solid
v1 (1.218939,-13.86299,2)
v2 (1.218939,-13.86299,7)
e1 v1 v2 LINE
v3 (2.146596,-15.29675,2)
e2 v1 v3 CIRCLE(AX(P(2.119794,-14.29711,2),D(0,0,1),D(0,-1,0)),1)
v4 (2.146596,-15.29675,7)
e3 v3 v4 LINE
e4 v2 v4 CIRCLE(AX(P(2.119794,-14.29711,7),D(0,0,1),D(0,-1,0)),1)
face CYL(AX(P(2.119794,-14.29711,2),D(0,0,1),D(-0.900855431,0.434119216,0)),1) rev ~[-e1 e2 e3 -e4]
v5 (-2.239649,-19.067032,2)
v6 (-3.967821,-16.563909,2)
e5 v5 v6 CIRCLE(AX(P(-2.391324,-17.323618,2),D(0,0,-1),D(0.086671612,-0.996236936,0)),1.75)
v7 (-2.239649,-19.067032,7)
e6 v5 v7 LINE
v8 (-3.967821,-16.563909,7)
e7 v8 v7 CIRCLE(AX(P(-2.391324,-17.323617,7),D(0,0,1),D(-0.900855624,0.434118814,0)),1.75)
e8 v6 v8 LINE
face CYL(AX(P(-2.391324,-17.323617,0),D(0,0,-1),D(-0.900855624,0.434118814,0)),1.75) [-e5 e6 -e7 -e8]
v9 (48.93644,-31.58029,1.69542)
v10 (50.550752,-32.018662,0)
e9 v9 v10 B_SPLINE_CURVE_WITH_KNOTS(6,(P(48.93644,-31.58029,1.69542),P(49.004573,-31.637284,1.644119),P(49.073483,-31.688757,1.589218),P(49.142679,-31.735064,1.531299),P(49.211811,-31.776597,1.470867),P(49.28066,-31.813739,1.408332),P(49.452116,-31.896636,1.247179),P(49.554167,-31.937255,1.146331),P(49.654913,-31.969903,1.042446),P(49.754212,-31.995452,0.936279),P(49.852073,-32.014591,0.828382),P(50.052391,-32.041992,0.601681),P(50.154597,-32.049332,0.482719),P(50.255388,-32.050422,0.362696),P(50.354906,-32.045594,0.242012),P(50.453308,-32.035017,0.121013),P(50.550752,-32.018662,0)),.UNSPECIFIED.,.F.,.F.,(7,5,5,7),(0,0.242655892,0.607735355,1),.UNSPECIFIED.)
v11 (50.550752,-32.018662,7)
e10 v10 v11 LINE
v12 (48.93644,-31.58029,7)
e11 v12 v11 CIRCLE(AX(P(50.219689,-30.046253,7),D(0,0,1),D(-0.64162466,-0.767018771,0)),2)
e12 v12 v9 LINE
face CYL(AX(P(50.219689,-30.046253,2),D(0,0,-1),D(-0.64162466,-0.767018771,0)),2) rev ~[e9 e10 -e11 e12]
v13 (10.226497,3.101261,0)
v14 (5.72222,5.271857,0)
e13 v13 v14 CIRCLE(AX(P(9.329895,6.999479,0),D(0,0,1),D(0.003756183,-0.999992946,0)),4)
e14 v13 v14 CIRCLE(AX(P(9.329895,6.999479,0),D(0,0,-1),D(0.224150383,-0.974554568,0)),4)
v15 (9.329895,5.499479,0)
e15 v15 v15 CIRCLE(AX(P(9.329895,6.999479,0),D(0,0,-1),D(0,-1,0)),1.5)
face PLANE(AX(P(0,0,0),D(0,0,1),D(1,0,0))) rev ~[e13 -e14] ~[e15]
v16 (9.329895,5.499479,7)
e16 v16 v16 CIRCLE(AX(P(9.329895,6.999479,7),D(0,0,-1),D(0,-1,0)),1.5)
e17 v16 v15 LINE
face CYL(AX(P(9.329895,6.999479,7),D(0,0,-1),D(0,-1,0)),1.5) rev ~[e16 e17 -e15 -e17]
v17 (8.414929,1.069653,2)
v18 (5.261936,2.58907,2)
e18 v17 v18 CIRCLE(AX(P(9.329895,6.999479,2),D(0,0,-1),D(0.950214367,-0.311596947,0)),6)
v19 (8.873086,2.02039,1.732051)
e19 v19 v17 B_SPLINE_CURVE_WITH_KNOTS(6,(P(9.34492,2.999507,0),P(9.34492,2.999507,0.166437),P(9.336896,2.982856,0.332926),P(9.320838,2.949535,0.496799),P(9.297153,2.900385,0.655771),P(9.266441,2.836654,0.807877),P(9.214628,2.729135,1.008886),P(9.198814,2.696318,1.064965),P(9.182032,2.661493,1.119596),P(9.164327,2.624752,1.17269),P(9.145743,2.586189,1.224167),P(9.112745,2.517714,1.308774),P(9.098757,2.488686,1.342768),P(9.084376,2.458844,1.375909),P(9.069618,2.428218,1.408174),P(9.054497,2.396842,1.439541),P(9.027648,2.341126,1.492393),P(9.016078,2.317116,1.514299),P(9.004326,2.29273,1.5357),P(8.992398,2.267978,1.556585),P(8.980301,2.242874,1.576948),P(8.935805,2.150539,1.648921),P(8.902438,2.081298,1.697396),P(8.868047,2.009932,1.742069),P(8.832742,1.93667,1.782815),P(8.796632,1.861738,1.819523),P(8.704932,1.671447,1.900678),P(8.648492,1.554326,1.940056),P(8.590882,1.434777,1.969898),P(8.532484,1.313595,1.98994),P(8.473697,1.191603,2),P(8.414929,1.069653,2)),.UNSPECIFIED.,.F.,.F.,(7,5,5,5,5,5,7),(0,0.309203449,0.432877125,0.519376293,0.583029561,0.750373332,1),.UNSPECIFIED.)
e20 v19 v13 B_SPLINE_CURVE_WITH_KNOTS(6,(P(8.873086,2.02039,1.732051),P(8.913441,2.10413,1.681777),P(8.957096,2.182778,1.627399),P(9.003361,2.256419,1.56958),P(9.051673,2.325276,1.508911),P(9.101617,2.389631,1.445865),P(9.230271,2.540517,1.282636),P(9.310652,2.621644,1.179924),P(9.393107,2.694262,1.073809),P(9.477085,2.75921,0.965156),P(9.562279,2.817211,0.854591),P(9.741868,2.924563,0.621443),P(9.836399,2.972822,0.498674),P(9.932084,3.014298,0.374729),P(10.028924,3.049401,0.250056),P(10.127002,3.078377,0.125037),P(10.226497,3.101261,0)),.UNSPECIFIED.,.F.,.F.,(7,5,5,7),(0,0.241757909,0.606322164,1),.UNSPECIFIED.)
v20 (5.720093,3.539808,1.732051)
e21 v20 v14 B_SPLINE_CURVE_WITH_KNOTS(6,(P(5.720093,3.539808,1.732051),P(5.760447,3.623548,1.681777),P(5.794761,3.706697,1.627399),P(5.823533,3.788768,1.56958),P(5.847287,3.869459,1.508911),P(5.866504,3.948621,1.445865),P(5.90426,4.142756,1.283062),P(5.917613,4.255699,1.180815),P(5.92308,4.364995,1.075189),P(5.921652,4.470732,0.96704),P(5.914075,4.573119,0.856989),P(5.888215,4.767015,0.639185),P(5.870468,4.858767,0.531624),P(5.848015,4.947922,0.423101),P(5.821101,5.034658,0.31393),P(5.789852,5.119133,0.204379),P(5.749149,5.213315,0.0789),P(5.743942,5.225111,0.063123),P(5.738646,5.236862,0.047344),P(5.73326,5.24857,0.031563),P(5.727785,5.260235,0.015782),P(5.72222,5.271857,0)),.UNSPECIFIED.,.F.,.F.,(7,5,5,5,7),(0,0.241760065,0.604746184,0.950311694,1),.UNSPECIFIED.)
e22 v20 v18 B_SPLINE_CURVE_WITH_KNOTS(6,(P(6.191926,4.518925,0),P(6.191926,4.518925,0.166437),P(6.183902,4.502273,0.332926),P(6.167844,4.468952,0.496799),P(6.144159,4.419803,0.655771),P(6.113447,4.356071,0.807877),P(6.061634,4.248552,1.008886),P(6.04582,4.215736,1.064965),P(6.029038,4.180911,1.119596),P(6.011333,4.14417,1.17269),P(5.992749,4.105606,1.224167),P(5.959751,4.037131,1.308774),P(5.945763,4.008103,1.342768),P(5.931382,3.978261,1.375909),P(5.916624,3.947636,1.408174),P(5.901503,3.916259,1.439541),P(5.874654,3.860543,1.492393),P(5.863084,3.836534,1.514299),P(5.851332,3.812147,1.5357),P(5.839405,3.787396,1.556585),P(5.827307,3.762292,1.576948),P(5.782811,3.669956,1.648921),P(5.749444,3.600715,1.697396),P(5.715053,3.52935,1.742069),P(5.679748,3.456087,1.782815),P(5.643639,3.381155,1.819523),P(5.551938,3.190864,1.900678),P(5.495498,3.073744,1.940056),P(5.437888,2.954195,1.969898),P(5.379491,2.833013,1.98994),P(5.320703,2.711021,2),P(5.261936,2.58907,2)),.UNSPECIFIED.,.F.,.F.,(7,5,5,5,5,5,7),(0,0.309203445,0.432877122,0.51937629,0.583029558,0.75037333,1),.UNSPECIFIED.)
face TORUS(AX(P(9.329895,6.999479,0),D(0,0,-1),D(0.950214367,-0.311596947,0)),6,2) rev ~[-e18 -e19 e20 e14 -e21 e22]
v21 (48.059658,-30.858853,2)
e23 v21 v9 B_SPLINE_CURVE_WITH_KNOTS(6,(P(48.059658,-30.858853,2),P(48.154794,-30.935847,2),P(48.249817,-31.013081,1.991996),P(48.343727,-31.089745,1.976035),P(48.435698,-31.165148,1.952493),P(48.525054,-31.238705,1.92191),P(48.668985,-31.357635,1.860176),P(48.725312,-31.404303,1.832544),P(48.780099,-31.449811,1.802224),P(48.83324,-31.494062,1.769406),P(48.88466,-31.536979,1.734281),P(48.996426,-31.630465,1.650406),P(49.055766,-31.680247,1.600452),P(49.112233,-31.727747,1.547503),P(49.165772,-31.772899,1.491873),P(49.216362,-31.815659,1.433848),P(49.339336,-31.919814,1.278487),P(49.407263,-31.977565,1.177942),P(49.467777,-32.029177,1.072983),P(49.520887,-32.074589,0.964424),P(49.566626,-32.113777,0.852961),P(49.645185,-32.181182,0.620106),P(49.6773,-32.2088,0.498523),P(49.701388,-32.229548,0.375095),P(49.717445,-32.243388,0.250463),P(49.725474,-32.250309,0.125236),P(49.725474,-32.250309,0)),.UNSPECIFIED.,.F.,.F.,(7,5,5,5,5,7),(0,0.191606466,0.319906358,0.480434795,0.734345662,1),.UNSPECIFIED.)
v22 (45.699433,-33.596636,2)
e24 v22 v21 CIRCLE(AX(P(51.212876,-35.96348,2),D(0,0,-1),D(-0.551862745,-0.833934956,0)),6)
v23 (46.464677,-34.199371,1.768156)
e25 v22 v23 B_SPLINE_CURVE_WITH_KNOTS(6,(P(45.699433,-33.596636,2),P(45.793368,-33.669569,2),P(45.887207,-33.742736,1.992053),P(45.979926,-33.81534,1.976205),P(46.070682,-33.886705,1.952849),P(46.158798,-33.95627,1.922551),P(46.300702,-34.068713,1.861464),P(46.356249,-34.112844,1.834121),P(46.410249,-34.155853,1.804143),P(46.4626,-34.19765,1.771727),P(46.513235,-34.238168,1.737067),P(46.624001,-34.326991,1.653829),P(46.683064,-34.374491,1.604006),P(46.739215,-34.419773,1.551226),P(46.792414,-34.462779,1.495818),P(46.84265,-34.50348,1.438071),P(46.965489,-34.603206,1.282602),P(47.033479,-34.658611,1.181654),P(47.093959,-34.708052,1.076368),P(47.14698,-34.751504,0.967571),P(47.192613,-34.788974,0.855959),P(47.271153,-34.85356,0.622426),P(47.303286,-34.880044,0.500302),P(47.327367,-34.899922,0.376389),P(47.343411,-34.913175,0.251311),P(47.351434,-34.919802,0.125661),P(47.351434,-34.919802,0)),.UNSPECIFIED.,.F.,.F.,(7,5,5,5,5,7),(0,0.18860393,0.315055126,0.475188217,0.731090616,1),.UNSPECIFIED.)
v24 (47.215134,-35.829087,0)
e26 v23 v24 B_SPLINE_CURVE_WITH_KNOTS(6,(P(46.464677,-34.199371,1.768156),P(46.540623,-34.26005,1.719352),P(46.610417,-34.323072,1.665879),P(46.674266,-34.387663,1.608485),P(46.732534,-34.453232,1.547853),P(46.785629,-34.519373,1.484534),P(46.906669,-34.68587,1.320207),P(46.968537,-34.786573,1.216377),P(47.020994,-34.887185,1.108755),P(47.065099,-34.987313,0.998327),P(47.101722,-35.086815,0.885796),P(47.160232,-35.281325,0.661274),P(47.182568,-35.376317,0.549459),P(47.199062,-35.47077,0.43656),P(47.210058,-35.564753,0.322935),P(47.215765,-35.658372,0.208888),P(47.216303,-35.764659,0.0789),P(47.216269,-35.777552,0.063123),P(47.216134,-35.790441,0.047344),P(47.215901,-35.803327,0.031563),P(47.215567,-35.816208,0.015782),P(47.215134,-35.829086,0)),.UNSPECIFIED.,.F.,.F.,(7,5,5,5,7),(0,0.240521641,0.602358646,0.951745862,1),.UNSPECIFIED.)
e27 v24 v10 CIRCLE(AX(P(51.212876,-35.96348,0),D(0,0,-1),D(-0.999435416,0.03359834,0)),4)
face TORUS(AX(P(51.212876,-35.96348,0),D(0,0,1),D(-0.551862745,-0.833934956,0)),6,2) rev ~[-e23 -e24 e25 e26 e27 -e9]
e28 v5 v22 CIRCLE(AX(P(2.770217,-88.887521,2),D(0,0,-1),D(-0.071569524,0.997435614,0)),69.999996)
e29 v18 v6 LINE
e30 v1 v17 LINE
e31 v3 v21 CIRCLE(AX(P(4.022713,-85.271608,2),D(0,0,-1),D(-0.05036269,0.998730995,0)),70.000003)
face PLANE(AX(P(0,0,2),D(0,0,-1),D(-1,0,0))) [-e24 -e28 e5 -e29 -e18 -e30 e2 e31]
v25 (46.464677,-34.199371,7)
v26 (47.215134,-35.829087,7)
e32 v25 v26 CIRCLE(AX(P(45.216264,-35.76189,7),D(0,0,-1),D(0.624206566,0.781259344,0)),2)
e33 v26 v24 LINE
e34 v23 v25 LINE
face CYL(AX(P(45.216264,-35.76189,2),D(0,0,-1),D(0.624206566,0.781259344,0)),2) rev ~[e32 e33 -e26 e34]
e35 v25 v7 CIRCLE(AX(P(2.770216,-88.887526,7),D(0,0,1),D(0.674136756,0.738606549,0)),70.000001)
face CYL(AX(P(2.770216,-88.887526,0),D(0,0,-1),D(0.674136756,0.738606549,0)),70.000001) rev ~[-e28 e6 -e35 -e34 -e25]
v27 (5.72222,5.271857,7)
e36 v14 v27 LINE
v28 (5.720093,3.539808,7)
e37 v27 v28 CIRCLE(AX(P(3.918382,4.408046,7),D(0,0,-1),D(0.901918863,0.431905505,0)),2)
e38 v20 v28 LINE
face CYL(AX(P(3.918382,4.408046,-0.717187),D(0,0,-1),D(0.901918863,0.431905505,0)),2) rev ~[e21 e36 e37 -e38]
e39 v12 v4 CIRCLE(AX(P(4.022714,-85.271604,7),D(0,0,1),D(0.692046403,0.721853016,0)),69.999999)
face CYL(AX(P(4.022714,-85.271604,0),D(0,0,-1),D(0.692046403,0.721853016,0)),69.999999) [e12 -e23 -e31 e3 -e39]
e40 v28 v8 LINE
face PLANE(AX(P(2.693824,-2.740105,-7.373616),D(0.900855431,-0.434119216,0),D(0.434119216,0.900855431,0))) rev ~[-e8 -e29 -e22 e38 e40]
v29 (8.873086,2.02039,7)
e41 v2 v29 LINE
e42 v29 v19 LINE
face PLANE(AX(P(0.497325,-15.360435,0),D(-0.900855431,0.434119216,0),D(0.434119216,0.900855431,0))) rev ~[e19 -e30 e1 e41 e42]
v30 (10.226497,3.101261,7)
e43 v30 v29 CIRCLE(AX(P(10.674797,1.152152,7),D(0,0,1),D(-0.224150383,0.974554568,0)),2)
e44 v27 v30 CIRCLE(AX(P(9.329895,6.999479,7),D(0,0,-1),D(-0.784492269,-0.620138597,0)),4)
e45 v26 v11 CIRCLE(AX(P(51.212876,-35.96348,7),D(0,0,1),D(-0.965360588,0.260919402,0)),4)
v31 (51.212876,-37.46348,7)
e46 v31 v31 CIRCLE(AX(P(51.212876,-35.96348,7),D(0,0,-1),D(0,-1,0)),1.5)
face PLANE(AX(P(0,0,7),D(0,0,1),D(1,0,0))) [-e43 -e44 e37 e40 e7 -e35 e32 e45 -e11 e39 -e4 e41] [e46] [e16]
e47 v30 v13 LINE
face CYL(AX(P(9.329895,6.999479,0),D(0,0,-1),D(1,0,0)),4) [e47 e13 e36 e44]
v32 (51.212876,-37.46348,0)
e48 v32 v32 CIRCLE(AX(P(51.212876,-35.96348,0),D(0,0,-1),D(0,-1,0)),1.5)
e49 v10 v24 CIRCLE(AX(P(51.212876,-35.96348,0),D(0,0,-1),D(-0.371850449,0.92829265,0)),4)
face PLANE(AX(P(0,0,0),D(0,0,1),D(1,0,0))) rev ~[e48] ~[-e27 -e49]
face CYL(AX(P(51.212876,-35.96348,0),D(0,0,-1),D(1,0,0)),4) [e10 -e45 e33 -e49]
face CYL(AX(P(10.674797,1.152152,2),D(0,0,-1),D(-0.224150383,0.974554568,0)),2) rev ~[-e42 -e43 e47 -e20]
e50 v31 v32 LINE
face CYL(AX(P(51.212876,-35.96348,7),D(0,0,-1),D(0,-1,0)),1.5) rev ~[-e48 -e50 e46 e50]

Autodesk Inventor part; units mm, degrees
ref_plane "YZ Plane" through (0, 0, 0) normal (1, 0, 0) x (0, 1, 0)
ref_plane "XZ Plane" through (0, 0, 0) normal (0, 1, 0) x (-1, 0, 0)
ref_plane "XY Plane" through (0, 0, 0) normal (0, 0, 1) x (1, 0, 0)
sketch "Sketch1" plane through (0, 0, 0) normal (0, 0, 1) x (1, 0, 0)
  circle A0 centre (9.329895, 6.999479) radius 4
  line L0 (9.329895, 6.999479) -> (-2.391324, -17.323617)
  circle A1 centre (51.212876, -35.96348) radius 4
  line L1 (9.329895, 6.999479) -> (-2.391324, -17.323617) construction
  line L2 (7.753398, 7.759188) -> (-3.967821, -16.563909)
  line L3 (-0.814827, -18.083326) -> (10.906392, 6.239771)
  arc A2 (10.906392, 6.239771) -> (7.753398, 7.759188) centre (9.329895, 6.999479) ccw
  arc A3 (-3.967821, -16.563909) -> (-0.814827, -18.083326) centre (-2.391324, -17.323617) ccw
  arc A4 (-2.542999, -15.580203) -> (-2.239649, -19.067032) centre (-2.391324, -17.323617) ccw
  arc A5 (49.95979, -37.185067) -> (52.465962, -34.741893) centre (51.212876, -35.96348) ccw
  arc A6 (49.95979, -37.185067) -> (-2.239649, -19.067032) centre (2.770217, -88.887525) ccw
  arc A7 (52.465962, -34.741893) -> (-2.542999, -15.580203) centre (4.022714, -85.271604) ccw
  point P0 (0, 0)
  point P1 (3.469285, -5.162069)
  point P2 (47.351434, -34.919803)
  point P3 (49.725474, -32.250309)
  point P4 (0.497325, -15.360435)
  point P5 (9.34492, 2.999507)
  point P6 (6.191926, 4.518925)
  point P7 (-2.239649, -19.067032)
  dimension "d0" = 8
  dimension "d1" = 27
  dimension "d3" = 8
  dimension "d4" = 3.5
  dimension "d6" = 3.5
  dimension "d7" = 70
  dimension "d8" = 70
extrude "Extrusion1" add sketch "Sketch1" along normal blind 7
sketch "Sketch2" plane through (0, 0, 7) normal (0, 0, 1) x (1, 0, 0)
  line L0 (0.497325, -15.360435) -> (9.34492, 2.999507)
  arc A0 (9.34492, 2.999507) -> (6.191926, 4.518925) centre (9.329895, 6.999479) ccw
  line L1 (6.191926, 4.518925) -> (-3.967821, -16.563909)
  arc A1 (-3.967821, -16.563909) -> (-2.239649, -19.067032) centre (-2.391324, -17.323617) ccw
  arc A2 (47.351434, -34.919803) -> (-2.239649, -19.067032) centre (2.770217, -88.887525) ccw
  arc A3 (47.351434, -34.919803) -> (49.725474, -32.250309) centre (51.212876, -35.96348) ccw
  arc A4 (49.725474, -32.250309) -> (0.497325, -15.360435) centre (4.022714, -85.271604) ccw
  point P0 (0, 0)
hole "Hole1" at (51.212876, -35.96348, 7) at (9.329895, 6.999479, 7) direction (0, 0, -1) diameter 3 depth 8
sketch "Sketch3" plane through (0, 0, 0) normal (0, 0, -1) x (-1, 0, 0)
  circle A0 centre (-51.212876, -35.96348) radius 1.5
  circle A1 centre (-9.329895, 6.999479) radius 1.5
  line L0 (-0.497325, -15.360435) -> (-9.34492, 2.999507)
  arc A2 (-0.497325, -15.360435) -> (-49.725474, -32.250309) centre (-4.022714, -85.271604) ccw
  arc A3 (-49.725474, -32.250309) -> (-47.351434, -34.919803) centre (-51.212876, -35.96348) ccw
  arc A4 (2.239649, -19.067032) -> (-47.351434, -34.919803) centre (-2.770217, -88.887525) ccw
  arc A5 (2.239649, -19.067032) -> (3.967821, -16.563909) centre (2.391324, -17.323617) ccw
  line L1 (-6.191926, 4.518925) -> (3.967821, -16.563909)
  arc A6 (-6.191926, 4.518925) -> (-9.34492, 2.999507) centre (-9.329895, 6.999479) ccw
  circle A7 centre (-9.329895, 6.999479) radius 4
  circle A8 centre (-51.212876, -35.96348) radius 4
  point P0 (0, 0)
  point P1 (-49.725474, -32.250309)
  dimension "d18" = 8
  dimension "d19" = 8
extrude "Extrusion2" cut sketch "Sketch3" against normal blind 2 contours L0 A7 L1 A5 A4 A8 A2
fillet "Fillet1" radius 2 6 edges at (47.3514, -34.9198, 4.5) (48.2239, -33.3053, 2) (49.7255, -32.2503, 4.5) (9.3449, 2.9995, 4.5) (7.5934, 3.3961, 2) (6.1919, 4.5189, 4.5)
fillet "Fillet2" radius 1 1 edges at (0.4973, -15.3604, 4.5)
properties part number "leg_link_3"
